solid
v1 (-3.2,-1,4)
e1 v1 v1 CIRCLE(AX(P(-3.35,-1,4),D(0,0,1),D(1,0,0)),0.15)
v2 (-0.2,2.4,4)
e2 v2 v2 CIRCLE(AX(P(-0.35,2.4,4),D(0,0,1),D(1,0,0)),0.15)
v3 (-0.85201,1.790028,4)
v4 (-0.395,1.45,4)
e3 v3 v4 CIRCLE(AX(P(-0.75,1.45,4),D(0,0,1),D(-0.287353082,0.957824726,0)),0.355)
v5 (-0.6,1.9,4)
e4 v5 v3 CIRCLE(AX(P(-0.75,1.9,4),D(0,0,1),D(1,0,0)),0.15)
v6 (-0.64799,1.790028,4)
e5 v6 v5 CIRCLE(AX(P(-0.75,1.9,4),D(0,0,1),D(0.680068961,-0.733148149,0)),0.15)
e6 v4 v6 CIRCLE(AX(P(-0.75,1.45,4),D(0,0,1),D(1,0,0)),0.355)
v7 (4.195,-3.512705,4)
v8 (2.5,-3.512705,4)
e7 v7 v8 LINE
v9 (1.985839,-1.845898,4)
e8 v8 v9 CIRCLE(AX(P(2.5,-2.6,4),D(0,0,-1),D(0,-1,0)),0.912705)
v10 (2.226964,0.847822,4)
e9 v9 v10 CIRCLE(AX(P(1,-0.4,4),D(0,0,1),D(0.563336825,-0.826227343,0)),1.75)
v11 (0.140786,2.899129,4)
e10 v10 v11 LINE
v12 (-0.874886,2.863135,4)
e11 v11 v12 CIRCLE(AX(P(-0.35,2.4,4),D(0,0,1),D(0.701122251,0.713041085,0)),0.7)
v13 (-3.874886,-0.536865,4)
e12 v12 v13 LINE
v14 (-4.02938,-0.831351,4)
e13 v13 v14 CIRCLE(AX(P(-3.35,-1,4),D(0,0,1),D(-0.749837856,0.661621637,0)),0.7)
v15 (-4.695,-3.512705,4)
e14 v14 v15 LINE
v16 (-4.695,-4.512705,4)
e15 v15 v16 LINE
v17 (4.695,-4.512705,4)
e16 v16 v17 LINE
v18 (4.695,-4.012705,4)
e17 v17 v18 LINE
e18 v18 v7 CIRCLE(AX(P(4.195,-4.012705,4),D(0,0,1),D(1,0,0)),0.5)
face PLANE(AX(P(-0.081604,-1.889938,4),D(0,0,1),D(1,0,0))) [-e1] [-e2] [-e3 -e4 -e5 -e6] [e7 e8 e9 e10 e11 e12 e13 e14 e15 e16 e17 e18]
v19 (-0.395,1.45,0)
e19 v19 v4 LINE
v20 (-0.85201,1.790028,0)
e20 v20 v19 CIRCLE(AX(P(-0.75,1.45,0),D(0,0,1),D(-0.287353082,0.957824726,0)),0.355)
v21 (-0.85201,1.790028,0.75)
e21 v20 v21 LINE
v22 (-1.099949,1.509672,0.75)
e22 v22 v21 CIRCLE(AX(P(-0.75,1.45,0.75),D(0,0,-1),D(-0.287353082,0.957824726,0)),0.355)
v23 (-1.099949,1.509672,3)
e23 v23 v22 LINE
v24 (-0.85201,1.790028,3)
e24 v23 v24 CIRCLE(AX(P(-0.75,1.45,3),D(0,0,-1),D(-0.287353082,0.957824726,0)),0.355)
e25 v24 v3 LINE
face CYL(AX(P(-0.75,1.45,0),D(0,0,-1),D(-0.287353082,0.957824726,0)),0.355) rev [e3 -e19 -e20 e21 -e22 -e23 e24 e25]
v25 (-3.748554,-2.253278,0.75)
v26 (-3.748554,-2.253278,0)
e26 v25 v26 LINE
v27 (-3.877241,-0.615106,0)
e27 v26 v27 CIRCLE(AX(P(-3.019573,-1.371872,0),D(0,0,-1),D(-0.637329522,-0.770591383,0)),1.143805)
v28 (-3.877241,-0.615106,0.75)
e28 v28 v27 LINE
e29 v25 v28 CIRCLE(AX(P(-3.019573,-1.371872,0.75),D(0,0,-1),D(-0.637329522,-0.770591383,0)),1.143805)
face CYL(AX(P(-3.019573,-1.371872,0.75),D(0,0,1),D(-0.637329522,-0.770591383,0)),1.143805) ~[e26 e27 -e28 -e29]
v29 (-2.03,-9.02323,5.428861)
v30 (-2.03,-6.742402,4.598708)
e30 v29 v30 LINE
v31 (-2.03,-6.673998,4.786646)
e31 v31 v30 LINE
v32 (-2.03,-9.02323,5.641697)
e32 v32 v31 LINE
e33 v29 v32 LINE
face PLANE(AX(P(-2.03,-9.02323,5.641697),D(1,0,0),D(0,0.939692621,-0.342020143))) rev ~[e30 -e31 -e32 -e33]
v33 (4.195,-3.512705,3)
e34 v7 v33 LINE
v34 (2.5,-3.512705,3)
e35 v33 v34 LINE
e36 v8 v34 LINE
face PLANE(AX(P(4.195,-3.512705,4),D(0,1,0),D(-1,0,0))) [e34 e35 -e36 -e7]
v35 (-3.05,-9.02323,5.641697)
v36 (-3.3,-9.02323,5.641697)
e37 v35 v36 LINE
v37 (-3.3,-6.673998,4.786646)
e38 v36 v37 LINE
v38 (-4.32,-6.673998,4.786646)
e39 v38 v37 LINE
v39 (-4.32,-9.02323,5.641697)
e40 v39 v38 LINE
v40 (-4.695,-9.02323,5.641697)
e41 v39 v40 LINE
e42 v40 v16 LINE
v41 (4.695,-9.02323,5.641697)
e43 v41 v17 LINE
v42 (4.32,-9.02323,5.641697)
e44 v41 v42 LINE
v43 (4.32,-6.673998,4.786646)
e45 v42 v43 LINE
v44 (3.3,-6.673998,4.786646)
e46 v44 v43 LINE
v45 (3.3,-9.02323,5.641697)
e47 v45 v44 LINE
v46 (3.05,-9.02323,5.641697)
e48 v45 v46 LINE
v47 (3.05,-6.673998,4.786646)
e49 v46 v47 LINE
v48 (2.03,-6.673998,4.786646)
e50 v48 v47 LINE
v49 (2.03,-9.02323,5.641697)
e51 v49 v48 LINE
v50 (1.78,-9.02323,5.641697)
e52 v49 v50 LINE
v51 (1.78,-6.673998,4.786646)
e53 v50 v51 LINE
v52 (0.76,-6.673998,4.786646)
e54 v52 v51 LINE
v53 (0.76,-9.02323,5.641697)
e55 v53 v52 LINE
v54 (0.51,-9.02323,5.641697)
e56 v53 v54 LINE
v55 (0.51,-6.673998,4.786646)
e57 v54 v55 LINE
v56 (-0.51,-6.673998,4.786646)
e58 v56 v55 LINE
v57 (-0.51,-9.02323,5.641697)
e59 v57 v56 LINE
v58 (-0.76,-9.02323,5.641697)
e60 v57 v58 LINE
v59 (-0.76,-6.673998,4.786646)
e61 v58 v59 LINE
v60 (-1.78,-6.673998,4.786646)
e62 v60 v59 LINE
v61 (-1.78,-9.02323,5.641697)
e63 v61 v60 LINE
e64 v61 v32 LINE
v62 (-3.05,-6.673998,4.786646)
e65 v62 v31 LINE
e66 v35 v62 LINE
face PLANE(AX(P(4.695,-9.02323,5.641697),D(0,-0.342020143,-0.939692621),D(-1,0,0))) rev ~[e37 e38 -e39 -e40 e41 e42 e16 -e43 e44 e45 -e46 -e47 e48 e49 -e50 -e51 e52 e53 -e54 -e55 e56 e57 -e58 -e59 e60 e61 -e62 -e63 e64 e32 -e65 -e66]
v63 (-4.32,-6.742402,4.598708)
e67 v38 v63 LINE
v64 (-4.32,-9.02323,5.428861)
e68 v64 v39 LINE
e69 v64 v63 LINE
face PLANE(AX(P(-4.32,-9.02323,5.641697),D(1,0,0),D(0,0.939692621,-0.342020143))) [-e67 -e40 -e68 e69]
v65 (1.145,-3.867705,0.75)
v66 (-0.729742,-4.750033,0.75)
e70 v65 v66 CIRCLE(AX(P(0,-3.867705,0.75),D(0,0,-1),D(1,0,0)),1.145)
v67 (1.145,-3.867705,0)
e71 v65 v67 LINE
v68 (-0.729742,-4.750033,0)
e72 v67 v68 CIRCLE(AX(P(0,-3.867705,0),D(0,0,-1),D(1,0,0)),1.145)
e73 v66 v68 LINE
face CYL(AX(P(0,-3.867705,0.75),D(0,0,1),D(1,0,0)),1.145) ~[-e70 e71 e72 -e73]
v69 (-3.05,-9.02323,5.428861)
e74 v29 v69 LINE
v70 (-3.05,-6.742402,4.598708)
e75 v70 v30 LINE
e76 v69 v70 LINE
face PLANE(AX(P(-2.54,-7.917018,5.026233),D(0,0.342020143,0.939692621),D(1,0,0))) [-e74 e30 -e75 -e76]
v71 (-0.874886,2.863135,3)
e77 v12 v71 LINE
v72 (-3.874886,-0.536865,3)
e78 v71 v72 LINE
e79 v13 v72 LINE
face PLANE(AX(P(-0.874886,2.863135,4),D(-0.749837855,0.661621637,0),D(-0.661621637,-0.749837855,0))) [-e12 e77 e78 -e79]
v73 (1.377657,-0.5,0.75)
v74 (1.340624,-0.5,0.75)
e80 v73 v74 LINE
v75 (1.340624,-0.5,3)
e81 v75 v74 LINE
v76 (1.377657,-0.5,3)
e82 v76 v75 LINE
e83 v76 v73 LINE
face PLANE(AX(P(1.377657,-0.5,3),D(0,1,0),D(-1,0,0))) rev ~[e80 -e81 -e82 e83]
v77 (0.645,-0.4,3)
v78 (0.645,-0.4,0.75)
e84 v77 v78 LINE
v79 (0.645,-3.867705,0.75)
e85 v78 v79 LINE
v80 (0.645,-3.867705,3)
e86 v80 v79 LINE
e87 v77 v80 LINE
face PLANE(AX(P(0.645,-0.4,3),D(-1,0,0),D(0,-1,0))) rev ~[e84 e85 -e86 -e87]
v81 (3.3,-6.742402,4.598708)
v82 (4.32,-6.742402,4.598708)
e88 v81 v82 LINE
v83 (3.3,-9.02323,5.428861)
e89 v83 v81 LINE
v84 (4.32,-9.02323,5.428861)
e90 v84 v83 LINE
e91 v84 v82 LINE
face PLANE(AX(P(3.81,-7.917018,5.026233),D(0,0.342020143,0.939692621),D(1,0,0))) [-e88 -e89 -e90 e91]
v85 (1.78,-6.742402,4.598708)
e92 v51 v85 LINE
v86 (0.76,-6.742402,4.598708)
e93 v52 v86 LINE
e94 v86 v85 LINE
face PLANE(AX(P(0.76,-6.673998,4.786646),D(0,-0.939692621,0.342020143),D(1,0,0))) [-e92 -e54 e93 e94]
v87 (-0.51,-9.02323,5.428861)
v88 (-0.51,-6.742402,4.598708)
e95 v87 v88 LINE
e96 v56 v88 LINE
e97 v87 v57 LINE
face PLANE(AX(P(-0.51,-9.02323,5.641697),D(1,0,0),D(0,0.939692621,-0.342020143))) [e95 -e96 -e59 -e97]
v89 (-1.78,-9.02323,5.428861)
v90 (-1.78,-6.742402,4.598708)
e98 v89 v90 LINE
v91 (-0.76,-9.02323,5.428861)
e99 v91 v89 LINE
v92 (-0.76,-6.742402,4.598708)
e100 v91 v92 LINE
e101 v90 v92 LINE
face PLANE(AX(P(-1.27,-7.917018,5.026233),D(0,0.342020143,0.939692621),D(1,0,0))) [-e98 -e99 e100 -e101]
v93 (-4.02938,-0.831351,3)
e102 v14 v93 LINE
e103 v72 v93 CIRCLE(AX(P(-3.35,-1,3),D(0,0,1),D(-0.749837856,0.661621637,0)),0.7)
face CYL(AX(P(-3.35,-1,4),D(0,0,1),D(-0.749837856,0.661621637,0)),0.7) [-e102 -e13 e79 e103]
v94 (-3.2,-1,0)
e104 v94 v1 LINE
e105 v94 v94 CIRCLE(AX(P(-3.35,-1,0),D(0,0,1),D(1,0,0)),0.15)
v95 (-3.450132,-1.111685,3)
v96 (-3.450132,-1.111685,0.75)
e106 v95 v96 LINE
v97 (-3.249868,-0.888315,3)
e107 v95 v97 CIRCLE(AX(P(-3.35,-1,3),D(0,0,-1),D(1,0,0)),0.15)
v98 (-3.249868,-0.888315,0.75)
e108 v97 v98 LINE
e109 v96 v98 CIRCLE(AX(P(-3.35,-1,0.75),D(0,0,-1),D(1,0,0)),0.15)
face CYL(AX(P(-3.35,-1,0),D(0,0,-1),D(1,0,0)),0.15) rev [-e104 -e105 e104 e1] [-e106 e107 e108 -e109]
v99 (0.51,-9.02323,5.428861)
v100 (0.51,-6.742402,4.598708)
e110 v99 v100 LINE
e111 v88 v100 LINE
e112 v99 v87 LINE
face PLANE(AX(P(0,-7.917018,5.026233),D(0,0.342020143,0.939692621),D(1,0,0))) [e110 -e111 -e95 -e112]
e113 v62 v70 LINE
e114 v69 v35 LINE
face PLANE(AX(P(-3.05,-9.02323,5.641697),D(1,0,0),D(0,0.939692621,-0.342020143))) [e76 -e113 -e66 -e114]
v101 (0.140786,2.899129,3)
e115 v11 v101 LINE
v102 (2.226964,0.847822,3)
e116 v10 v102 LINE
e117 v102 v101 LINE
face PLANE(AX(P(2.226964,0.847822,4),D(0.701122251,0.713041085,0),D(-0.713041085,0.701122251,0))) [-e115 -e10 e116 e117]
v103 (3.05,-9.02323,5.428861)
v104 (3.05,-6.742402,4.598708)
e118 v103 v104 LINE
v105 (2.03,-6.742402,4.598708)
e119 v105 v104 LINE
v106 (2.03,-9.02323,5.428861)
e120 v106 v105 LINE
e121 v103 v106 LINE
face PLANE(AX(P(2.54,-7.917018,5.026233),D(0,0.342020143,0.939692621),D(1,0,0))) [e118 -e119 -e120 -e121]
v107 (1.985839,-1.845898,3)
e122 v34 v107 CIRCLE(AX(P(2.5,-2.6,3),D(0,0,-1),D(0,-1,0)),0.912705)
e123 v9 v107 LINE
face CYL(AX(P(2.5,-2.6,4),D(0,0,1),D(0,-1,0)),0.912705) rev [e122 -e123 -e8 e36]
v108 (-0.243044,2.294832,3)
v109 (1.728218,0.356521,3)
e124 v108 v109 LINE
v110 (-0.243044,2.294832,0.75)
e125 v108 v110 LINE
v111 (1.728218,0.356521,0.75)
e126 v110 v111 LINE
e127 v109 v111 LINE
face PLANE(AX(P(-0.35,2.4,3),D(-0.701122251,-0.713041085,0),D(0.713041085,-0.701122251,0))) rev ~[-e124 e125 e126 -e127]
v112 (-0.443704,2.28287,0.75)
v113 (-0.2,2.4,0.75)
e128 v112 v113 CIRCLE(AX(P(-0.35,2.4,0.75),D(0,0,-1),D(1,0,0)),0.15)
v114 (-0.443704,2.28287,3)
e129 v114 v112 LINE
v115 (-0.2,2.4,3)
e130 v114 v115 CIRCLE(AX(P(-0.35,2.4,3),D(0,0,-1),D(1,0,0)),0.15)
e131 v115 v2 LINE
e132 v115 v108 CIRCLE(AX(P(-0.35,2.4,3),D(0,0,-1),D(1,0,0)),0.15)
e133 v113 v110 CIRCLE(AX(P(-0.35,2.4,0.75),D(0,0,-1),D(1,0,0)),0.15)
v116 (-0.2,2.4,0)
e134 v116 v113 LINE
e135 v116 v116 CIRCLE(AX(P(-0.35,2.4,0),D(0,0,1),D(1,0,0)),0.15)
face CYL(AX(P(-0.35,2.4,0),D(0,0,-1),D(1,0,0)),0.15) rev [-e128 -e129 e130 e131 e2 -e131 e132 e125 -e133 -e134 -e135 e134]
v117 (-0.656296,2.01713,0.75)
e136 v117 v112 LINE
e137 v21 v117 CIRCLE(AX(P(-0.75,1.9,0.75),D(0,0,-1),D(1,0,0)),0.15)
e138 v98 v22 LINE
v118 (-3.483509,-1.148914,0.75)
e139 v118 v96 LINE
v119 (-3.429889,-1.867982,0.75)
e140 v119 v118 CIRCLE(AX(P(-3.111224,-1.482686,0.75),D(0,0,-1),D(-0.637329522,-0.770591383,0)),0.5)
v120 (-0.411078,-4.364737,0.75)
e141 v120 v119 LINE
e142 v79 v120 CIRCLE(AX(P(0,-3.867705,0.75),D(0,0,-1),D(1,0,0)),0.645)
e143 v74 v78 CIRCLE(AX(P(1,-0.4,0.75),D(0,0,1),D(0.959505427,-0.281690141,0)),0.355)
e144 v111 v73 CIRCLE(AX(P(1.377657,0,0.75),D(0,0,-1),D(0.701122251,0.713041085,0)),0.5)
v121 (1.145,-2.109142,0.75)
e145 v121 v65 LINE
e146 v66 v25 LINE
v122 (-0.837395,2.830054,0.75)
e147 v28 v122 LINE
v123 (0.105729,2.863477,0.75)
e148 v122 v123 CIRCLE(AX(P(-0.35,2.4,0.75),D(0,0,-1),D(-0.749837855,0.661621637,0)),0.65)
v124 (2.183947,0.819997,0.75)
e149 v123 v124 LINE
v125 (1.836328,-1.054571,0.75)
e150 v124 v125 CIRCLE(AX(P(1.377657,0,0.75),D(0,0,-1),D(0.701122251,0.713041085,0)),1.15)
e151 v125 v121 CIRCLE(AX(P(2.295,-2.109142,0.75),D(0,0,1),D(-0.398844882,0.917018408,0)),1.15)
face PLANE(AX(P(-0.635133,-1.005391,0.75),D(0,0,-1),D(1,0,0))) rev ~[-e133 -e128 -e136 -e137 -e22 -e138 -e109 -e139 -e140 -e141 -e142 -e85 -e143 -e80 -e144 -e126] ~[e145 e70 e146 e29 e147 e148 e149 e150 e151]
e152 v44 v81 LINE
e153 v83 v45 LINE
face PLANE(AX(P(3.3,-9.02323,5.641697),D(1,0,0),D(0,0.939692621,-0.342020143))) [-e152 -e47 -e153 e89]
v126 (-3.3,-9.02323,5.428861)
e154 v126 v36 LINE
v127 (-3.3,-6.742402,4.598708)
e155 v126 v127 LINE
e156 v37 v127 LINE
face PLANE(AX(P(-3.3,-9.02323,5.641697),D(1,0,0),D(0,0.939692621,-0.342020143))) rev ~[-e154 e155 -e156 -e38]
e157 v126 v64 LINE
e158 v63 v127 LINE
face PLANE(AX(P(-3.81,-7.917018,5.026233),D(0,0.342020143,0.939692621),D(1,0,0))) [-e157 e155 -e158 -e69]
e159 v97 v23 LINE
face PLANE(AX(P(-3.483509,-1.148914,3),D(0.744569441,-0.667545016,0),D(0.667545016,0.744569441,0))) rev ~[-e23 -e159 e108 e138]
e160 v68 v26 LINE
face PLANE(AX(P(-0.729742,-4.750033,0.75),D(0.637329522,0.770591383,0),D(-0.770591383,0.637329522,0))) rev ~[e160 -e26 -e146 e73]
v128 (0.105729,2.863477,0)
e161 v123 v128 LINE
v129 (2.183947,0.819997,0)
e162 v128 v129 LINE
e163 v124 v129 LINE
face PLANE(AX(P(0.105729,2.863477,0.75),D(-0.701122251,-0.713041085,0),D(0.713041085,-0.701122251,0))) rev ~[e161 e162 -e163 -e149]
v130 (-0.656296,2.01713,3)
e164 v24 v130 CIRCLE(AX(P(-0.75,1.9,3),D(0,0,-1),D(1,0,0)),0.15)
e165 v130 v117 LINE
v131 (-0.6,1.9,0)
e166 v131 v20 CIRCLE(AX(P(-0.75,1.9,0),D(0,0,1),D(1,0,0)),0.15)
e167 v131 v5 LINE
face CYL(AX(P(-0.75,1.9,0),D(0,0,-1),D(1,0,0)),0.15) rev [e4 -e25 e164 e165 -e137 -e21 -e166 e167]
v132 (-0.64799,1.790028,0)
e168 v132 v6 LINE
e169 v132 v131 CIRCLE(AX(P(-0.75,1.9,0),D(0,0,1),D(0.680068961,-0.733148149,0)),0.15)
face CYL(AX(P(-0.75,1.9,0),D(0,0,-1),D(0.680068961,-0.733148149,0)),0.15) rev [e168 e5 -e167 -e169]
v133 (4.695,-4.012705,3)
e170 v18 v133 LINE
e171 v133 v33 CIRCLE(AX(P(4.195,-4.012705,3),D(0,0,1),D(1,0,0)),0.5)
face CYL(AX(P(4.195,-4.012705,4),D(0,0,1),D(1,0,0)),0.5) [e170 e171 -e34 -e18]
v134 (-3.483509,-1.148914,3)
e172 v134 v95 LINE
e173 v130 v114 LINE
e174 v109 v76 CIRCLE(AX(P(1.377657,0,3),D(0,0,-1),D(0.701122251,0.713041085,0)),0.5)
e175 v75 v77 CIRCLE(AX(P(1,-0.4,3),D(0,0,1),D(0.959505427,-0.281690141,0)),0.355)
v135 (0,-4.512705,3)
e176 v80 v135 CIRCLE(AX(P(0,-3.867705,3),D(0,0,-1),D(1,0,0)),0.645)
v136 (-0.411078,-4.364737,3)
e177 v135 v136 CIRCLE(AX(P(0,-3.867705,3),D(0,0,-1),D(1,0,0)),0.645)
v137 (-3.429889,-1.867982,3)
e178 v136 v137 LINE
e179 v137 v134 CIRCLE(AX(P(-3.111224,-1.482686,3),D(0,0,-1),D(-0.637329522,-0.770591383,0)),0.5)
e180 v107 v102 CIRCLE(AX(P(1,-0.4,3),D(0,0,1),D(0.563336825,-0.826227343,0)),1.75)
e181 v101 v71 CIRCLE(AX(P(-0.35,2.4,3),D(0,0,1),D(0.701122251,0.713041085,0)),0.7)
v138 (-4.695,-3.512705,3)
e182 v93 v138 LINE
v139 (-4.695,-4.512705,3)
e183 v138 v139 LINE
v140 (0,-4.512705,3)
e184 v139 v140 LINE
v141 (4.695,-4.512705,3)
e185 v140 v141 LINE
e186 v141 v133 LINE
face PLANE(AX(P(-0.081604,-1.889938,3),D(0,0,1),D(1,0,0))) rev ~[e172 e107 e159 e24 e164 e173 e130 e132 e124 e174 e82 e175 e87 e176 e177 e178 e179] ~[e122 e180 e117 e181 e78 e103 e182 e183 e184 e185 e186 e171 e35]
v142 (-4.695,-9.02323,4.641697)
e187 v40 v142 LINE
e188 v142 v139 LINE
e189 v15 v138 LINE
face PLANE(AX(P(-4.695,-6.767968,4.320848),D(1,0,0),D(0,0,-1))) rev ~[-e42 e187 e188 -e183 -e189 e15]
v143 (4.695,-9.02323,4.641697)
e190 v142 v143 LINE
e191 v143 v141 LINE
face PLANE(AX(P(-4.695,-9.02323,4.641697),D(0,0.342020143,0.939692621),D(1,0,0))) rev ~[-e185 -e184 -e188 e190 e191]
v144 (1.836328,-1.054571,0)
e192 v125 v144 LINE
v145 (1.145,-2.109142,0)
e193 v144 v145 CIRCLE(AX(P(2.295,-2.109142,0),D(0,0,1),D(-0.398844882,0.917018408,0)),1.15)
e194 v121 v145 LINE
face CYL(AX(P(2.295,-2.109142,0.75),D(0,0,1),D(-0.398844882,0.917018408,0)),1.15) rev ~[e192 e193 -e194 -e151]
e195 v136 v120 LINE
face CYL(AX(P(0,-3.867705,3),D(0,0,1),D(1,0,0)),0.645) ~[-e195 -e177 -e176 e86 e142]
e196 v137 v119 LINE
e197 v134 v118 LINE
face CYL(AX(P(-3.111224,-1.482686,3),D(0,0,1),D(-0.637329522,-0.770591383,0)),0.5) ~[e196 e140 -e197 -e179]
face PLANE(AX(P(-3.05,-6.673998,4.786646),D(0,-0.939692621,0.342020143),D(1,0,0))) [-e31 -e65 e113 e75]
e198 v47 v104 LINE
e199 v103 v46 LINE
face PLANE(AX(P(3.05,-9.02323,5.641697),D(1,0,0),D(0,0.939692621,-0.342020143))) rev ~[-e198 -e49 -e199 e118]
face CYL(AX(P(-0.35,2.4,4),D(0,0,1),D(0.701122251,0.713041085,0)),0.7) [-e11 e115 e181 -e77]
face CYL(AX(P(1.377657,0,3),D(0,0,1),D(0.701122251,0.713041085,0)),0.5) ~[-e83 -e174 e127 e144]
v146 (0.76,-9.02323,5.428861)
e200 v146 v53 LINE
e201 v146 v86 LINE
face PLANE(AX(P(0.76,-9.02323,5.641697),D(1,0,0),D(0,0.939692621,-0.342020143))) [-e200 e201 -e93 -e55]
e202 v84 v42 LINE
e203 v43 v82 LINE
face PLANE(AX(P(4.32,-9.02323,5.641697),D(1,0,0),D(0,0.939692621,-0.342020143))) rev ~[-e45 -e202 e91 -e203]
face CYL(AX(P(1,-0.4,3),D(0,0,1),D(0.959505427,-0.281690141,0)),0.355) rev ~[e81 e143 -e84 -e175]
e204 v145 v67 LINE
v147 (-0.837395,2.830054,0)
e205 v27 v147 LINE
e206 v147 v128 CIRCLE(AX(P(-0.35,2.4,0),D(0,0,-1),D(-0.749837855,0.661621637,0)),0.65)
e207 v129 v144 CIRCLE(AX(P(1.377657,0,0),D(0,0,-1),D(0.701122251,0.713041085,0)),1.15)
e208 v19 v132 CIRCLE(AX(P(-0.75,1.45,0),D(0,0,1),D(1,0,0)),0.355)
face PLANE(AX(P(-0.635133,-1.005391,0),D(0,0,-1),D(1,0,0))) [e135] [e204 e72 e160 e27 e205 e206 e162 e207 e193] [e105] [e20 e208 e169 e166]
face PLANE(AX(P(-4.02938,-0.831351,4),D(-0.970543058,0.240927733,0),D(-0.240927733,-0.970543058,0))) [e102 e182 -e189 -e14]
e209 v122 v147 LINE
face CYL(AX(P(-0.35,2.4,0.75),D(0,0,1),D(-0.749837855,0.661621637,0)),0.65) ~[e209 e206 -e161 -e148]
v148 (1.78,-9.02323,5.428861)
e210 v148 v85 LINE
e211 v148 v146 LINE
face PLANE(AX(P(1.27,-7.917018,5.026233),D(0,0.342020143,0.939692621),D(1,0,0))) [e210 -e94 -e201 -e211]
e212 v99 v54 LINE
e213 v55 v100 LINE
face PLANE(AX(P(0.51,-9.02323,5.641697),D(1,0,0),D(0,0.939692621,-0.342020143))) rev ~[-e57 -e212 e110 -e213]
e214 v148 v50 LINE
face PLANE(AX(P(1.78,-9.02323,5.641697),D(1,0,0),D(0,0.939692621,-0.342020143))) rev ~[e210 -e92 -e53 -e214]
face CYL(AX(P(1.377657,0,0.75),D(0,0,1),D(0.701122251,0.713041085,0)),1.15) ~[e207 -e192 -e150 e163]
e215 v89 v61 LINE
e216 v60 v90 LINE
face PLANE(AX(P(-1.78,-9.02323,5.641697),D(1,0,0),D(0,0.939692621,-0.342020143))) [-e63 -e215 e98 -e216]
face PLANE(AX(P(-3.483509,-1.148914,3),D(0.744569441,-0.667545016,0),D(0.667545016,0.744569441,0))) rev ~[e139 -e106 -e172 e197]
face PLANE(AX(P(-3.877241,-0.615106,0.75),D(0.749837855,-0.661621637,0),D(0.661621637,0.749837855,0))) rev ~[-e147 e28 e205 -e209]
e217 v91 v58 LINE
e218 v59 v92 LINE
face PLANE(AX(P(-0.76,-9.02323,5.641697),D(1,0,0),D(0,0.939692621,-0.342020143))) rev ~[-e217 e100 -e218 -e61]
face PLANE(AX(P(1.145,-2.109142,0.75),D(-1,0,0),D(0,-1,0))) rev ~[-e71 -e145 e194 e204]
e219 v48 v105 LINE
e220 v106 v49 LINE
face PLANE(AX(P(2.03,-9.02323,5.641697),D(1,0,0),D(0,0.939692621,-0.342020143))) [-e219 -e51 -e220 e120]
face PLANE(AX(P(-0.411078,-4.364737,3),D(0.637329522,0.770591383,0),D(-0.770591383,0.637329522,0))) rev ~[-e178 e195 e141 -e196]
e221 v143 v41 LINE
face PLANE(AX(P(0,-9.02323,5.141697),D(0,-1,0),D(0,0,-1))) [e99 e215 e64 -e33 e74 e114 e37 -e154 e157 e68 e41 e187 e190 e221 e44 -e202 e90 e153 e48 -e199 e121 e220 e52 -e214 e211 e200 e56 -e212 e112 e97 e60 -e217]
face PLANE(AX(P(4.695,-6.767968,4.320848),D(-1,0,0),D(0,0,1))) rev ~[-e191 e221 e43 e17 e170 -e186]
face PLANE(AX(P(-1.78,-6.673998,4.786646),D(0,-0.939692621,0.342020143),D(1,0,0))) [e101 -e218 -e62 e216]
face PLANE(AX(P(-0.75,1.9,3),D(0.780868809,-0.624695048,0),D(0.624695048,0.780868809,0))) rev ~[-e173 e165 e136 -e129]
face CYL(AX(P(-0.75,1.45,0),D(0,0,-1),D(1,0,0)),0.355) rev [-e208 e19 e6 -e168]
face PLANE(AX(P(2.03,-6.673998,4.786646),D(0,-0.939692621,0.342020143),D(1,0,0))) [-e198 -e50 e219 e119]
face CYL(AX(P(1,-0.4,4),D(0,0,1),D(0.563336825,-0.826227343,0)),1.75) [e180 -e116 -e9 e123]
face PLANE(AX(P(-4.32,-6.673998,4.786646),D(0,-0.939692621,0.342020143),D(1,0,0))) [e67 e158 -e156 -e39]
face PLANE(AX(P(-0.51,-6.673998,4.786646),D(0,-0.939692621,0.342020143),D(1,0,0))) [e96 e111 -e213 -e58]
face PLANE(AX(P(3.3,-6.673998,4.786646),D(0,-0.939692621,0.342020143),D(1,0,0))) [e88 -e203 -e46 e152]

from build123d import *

# Parameters (mm, degrees)
F3_R      = 0.15
F4_DEPTH  = 4
F3_R_2    = 0.85
F6_DEPTH  = 1
F8_DEPTH  = 2.25
F10_DEPTH = 0.75
F14_W     = 1.02
F14_H     = 2.5
F15_DEPTH = 0.2


with BuildPart() as f4:
    # F3 (on Top) → F4 (new body)
    with BuildSketch(Plane.XY):
        with Locations((-3.35, -1)):
            Circle(F3_R)
    extrude(amount=F4_DEPTH)


with BuildPart() as f4b:
    # F3 (on Top) → F4, piece 2 (new body)
    with BuildSketch(Plane.XY):
        with BuildLine():
            ThreePointArc((-0.6479896557, 1.7900277778), (-0.6125199075, 1.8400064655), (-0.6, 1.9))
            ThreePointArc((-0.6, 1.9), (-0.8099935345, 2.0374800925), (-0.8520103443, 1.7900277778))
            ThreePointArc((-0.8520103443, 1.7900277778), (-0.75, 1.805), (-0.6479896557, 1.7900277778))
        make_face()
        with BuildLine():
            ThreePointArc((-0.6479896557, 1.7900277778), (-0.75, 1.805), (-0.8520103443, 1.7900277778))
            ThreePointArc((-0.8520103443, 1.7900277778), (-0.75, 1.75), (-0.6479896557, 1.7900277778))
        make_face()
        with BuildLine():
            ThreePointArc((-0.6479896557, 1.7900277778), (-0.75, 1.75), (-0.8520103443, 1.7900277778))
            ThreePointArc((-0.8520103443, 1.7900277778), (-0.9619095654, 1.1651854356), (-0.395, 1.45))
            ThreePointArc((-0.395, 1.45), (-0.4651854356, 1.6619095654), (-0.6479896557, 1.7900277778))
        make_face()
    extrude(amount=F4_DEPTH)


with BuildPart() as f4c:
    # F3 (on Top) → F4, piece 3 (new body)
    with BuildSketch(Plane.XY):
        with Locations((-0.35, 2.4)):
            Circle(F3_R)
    extrude(amount=F4_DEPTH)


with BuildPart() as f4d:
    # F3 (on Top) → F4, piece 4 (new body)
    with BuildSketch(Plane.XY):
        with Locations((2.5, -2.6)):
            Circle(F3_R_2)
    extrude(amount=F4_DEPTH)


with BuildPart() as f6:
    # F5 (on face) → F6 (new body)
    with BuildSketch(Plane.XY.offset(4)):
        with BuildLine():
            ThreePointArc((1.9858394431, -1.8458978499), (2.7430307581, -0.5560249217), (2.2269639391, 0.8478218992))
            Line((2.2269639391, 0.8478218992), (0.1407855756, 2.8991287597))
            ThreePointArc((0.1407855756, 2.8991287597), (-0.3747911939, 3.0995608599), (-0.8748864988, 2.863135146))
            Line((-0.8748864988, 2.863135146), (-3.8748864988, -0.536864854))
            ThreePointArc((-3.8748864988, -0.536864854), (-3.9698749845, -0.674800056), (-4.0293801406, -0.831350587))
            Line((-4.0293801406, -0.831350587), (-4.695, -3.5127053911))
            Line((-4.695, -3.5127053911), (-4.695, -4.5127053911))
            Line((-4.695, -4.5127053911), (4.695, -4.5127053911))
            Line((4.695, -4.5127053911), (4.695, -4.0127053911))
            ThreePointArc((4.695, -4.0127053911), (4.5485533906, -3.6591520005), (4.195, -3.5127053911))
            Line((4.195, -3.5127053911), (2.5, -3.5127053911))
            ThreePointArc((2.5, -3.5127053911), (1.6278462782, -2.869033486), (1.9858394431, -1.8458978499))
        make_face()
    extrude(amount=-F6_DEPTH)

    # F7 (on face) → F8 (join)
    with BuildSketch(Plane(origin=(0, 0, 3), x_dir=(1, 0, 0), z_dir=(0, 0, -1))):
        with BuildLine():
            ThreePointArc((0.645, 3.8677053911), (0.2746634171, 4.4513020046), (-0.411077542, 4.3647368333))
            Line((-0.411077542, 4.3647368333), (-3.429889044, 1.8679820876))
            ThreePointArc((-3.429889044, 1.8679820876), (-3.6098399318, 1.5198675017), (-3.4835090032, 1.1489138881))
            Line((-3.4835090032, 1.1489138881), (-0.75, -1.9))
            Line((-0.75, -1.9), (-0.35, -2.4))
            Line((-0.35, -2.4), (1.7282178972, -0.3565205426))
            ThreePointArc((1.7282178972, -0.3565205426), (1.840398747, 0.1893934116), (1.3776567718, 0.5))
            Line((1.3776567718, 0.5), (1.3406244266, 0.5))
            ThreePointArc((1.3406244266, 0.5), (1.0505140008, 0.0486122715), (0.645, 0.4))
            Line((0.645, 0.4), (0.645, 3.8677053911))
        make_face()
    extrude(amount=F8_DEPTH)

    # F9 (on face) → F10 (join)
    with BuildSketch(Plane(origin=(0, 0, 0.75), x_dir=(1, 0, 0), z_dir=(0, 0, -1))):
        with BuildLine():
            ThreePointArc((-3.7485538053, 2.2532777792), (-4.1598651003, 1.4614479318), (-3.8772413796, 0.6151056127))
            Line((-3.8772413796, 0.6151056127), (-0.837394606, -2.8300540641))
            ThreePointArc((-0.837394606, -2.8300540641), (-0.3730203944, -3.049592227), (0.1057294631, -2.8634767054))
            Line((0.1057294631, -2.8634767054), (2.1839473603, -0.8199972481))
            ThreePointArc((2.1839473603, -0.8199972481), (2.5083795632, 0.2096806356), (1.8363283859, 1.054571169))
            ThreePointArc((1.8363283859, 1.054571169), (1.3332379826, 1.4786553659), (1.145, 2.1091423379))
            Line((1.145, 2.1091423379), (1.145, 3.8677053911))
            ThreePointArc((1.145, 3.8677053911), (0.4875807948, 4.9037024802), (-0.7297423032, 4.7500325249))
            Line((-0.7297423032, 4.7500325249), (-3.7485538053, 2.2532777792))
        make_face()
    extrude(amount=F10_DEPTH)

    # F11: cut F4, F4b, F4c, F4d
    add(f4.part, mode=Mode.SUBTRACT)
    add(f4b.part, mode=Mode.SUBTRACT)
    add(f4c.part, mode=Mode.SUBTRACT)
    add(f4d.part, mode=Mode.SUBTRACT)

    # F13: sweep along a path in F12
    with BuildLine(Plane.YZ) as f13_path:
        Line((-9.0232299709, 5.641696688), (-4.5127053911, 4))
    # F6_face1 (on face) → F13 (sweep)
    with BuildSketch(Plane(origin=(0, -4.5127053911, 3.5), x_dir=(1, 0, 0), z_dir=(0, -1, 0))):
        Polygon((-4.695, 0.5), (-4.695, -0.5), (0, -0.5), (4.695, -0.5), (4.695, 0.5), align=None)
    sweep(path=f13_path.line)

    # F14 (on face) → F15 (cut)
    with BuildSketch(Plane(origin=(0, 0.757688968, 2.0817333304), x_dir=(1, 0, 0), z_dir=(0, 0.3420201433, 0.9396926208))):
        with Locations((-3.81, -9.1586365291)):
            Rectangle(F14_W, F14_H)
        with Locations((-2.54, -9.1586365291)):
            Rectangle(F14_W, F14_H)
        with Locations((-1.27, -9.1586365291)):
            Rectangle(F14_W, F14_H)
        with Locations((0, -9.1586365291)):
            Rectangle(F14_W, F14_H)
        with Locations((1.27, -9.1586365291)):
            Rectangle(F14_W, F14_H)
        with Locations((2.54, -9.1586365291)):
            Rectangle(F14_W, F14_H)
        with Locations((3.81, -9.1586365291)):
            Rectangle(F14_W, F14_H)
    extrude(amount=-F15_DEPTH, mode=Mode.SUBTRACT)


solid = f6.part
